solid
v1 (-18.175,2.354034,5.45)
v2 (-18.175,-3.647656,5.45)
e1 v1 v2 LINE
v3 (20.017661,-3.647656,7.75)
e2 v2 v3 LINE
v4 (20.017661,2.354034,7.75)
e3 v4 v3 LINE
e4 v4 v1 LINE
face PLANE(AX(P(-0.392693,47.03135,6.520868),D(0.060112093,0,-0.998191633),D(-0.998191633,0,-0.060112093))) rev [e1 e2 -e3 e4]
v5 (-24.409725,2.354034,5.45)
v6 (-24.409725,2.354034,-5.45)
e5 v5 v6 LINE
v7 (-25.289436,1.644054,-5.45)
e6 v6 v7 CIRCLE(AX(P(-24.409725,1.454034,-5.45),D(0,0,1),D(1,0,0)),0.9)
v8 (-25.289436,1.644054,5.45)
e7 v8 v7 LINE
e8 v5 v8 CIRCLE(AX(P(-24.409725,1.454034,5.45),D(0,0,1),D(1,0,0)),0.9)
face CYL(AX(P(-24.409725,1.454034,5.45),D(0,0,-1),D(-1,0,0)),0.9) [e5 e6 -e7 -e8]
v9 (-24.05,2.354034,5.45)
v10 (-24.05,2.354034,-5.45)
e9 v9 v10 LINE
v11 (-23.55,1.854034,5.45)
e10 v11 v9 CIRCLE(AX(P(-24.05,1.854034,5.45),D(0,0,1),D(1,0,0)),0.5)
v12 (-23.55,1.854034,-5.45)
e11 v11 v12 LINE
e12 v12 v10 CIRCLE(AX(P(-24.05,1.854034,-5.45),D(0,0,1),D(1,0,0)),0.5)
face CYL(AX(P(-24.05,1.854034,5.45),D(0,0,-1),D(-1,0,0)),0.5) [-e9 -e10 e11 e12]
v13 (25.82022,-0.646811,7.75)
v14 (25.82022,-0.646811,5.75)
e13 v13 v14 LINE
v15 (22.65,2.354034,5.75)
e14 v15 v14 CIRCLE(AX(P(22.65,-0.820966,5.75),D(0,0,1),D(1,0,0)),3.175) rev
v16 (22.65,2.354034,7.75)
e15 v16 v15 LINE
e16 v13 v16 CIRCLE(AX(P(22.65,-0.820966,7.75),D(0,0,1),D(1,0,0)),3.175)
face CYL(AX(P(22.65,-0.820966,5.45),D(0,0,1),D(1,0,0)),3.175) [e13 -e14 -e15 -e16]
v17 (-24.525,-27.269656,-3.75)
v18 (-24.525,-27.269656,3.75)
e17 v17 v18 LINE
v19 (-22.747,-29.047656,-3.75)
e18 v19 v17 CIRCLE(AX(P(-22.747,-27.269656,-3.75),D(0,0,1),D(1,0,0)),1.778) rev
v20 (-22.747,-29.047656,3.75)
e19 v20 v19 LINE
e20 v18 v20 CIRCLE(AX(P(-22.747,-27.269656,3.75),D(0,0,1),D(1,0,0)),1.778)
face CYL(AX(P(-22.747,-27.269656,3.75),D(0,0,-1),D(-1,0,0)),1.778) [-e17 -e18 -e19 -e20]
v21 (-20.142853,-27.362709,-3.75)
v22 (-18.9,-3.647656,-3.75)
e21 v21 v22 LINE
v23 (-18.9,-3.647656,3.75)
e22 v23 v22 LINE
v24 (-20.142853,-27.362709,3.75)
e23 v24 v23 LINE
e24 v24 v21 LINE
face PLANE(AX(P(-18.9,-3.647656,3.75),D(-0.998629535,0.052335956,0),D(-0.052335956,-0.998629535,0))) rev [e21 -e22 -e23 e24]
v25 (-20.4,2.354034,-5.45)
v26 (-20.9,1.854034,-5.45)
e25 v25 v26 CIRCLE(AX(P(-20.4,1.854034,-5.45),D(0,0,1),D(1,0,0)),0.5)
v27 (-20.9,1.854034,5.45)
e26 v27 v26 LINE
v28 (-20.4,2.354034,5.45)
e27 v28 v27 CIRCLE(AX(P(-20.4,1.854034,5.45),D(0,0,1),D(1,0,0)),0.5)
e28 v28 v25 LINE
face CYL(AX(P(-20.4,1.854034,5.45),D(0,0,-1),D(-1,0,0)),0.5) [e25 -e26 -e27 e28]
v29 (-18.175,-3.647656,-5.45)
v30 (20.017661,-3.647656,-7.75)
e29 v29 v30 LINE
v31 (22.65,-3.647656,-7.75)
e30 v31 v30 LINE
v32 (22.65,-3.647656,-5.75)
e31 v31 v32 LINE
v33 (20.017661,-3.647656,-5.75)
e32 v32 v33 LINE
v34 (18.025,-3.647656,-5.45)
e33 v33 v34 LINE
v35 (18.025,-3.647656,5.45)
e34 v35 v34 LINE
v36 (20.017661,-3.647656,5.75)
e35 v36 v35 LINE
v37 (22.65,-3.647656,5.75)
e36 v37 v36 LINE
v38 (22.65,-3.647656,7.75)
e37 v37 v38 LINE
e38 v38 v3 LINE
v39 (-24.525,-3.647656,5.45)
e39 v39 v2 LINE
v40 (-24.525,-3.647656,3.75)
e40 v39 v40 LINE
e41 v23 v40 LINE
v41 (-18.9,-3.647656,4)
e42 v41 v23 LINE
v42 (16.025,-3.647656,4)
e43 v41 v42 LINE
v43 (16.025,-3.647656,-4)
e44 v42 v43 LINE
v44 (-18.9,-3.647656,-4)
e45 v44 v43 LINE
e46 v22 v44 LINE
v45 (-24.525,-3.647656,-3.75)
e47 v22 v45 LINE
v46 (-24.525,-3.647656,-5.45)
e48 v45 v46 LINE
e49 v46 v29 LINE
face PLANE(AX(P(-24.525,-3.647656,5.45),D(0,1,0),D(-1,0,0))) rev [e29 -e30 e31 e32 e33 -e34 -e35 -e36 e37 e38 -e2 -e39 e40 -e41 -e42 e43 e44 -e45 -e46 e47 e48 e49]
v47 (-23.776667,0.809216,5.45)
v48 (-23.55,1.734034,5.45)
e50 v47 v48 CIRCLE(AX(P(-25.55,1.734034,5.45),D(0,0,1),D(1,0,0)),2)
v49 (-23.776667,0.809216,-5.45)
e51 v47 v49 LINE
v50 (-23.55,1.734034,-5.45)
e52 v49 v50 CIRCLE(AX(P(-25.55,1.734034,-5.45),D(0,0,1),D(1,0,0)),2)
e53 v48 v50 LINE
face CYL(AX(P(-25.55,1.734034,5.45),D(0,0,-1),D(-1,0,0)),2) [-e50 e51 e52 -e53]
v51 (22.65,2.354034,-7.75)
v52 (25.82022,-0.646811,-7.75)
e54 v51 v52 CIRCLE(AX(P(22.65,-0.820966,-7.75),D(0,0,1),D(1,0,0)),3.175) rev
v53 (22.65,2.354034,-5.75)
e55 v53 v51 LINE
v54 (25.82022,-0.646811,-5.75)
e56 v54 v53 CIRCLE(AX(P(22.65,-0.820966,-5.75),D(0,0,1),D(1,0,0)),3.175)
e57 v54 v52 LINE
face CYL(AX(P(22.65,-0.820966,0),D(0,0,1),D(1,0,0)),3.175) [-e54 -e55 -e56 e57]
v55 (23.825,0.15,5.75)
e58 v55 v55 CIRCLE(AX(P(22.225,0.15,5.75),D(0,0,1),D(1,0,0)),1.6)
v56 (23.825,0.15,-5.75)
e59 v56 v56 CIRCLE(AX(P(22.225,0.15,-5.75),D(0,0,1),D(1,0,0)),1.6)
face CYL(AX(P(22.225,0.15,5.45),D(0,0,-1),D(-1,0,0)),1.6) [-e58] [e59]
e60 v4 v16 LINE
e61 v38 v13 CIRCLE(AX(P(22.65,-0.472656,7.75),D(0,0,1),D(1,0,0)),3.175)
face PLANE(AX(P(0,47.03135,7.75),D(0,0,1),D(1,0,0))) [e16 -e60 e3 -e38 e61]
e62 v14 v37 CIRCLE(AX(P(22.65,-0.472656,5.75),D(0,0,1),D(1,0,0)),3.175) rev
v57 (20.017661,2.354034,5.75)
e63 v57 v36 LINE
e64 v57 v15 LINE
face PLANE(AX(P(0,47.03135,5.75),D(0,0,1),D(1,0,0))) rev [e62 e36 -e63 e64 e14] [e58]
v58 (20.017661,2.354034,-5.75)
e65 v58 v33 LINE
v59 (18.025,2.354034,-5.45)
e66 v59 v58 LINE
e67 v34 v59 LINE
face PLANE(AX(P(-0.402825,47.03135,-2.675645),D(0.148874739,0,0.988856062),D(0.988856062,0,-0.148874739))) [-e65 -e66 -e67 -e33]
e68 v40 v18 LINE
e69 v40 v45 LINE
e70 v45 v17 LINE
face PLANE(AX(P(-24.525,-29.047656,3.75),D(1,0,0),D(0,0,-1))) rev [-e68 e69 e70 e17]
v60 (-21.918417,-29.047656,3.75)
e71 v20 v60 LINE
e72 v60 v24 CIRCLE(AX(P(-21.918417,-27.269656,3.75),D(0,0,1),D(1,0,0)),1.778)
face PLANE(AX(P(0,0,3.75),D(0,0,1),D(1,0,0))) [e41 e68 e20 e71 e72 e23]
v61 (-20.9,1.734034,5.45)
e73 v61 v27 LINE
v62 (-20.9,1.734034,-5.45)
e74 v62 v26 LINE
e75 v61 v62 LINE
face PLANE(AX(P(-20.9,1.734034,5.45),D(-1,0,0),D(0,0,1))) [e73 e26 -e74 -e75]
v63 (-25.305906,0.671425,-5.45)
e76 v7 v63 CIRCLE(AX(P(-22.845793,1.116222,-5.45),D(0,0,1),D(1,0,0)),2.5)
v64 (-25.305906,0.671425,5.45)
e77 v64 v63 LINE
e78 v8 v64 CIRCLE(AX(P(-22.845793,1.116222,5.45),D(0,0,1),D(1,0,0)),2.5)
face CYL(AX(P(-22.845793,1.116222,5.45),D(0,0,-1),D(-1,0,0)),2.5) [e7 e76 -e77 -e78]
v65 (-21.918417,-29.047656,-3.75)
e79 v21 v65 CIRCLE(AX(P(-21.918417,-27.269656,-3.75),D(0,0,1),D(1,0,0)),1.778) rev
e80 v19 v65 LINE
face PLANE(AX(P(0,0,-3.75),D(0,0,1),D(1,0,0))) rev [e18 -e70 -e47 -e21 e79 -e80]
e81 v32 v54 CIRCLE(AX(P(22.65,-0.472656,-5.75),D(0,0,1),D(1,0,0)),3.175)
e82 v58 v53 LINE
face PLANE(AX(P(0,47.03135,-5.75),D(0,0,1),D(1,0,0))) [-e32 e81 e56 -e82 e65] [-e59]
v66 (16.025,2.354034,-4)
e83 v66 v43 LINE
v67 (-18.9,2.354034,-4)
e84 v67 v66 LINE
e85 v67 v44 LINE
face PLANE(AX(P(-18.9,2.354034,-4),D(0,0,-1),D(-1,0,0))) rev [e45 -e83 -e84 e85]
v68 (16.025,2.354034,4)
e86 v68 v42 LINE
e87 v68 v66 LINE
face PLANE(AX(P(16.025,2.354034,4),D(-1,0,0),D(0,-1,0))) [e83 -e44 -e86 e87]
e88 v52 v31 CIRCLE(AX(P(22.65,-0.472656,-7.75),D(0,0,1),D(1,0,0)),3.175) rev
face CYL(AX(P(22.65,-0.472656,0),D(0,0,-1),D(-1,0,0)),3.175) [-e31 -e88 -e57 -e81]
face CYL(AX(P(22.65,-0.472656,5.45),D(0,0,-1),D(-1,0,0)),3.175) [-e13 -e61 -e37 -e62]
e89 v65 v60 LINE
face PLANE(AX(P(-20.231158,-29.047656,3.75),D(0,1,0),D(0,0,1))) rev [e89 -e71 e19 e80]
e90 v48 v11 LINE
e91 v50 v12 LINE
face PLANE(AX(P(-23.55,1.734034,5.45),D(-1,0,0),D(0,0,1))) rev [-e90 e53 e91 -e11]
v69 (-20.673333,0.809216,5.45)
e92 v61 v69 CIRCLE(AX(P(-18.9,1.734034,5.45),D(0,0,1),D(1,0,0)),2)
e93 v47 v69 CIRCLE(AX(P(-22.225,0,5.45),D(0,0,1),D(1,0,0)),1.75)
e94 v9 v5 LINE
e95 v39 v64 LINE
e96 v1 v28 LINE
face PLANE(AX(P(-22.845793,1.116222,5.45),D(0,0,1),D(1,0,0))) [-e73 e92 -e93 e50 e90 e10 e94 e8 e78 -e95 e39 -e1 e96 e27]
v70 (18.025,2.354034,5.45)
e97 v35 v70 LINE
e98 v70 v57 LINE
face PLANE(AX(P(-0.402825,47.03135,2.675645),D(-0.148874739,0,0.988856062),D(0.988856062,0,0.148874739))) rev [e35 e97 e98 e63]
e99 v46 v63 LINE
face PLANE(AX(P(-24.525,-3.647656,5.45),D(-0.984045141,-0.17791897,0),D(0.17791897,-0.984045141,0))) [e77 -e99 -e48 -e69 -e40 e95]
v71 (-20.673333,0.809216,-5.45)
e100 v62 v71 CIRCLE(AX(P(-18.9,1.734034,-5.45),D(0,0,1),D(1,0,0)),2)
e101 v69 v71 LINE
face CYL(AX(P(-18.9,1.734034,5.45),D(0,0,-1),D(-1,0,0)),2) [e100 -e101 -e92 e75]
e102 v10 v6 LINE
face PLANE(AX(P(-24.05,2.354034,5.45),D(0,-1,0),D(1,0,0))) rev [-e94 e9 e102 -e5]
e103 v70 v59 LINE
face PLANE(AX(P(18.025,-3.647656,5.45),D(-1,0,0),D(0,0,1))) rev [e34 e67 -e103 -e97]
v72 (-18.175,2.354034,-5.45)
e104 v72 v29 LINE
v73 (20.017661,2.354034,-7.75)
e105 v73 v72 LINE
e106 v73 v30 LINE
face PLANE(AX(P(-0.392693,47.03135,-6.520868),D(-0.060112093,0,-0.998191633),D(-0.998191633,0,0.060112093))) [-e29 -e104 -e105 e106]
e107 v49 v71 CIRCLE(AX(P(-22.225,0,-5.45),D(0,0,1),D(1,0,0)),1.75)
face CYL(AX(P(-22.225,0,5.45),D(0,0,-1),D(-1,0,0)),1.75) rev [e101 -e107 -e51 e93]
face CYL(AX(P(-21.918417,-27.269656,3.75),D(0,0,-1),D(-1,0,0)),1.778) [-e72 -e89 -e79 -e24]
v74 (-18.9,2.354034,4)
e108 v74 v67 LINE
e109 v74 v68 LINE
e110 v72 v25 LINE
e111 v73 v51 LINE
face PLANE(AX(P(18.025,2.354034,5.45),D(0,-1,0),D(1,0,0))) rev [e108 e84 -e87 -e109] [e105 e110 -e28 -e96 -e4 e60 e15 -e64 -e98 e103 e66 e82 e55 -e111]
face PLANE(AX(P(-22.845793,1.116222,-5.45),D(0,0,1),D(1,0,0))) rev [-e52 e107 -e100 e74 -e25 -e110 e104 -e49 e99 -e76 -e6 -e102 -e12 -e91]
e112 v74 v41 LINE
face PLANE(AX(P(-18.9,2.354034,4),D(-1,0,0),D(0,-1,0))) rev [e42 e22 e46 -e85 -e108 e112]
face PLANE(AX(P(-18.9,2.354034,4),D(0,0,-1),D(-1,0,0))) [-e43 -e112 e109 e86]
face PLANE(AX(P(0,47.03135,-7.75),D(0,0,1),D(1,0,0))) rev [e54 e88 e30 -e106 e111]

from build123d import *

# Parameters (mm, degrees)
BOSS_EXTRUDE1_DEPTH   = 5.45
BOSS_EXTRUDE1_2_DEPTH = 5.45
BOSS_EXTRUDE2_DEPTH   = 5.75
BOSS_EXTRUDE3_DEPTH   = 6.001690088
FILLET1_R             = 3.175
SKETCH3_W             = 34.925
SKETCH3_H             = 8
CUT_EXTRUDE1_DEPTH    = 28.618228517
BOSS_EXTRUDE5_DEPTH   = 3.75
FILLET2_R             = 1.778


with BuildPart() as part:
    # Sketch1 → Boss-Extrude1 (new, symmetric)
    with BuildSketch(Plane.XY):
        with BuildLine():
            ThreePointArc((20.625, 0.15), (20.842969199, -0.656220109), (21.43748858, -1.242776279))
            ThreePointArc((21.43748858, -1.242776279), (23.824989974, 0.155664255), (21.42764708, 1.537165571))
            ThreePointArc((21.42764708, 1.537165571), (20.840123711, 0.951322447), (20.625, 0.15))
        make_face()
    extrude(amount=BOSS_EXTRUDE1_DEPTH, both=True)

    # Sketch1<4> → Boss-Extrude2 (add, symmetric)
    with BuildSketch(Plane.XY):
        with BuildLine():
            ThreePointArc((20.625, 0.15), (20.842969199, -0.656220109), (21.43748858, -1.242776279))
            ThreePointArc((21.43748858, -1.242776279), (23.824989974, 0.155664255), (21.42764708, 1.537165571))
            ThreePointArc((21.42764708, 1.537165571), (20.840123711, 0.951322447), (20.625, 0.15))
        make_face()
    extrude(amount=BOSS_EXTRUDE2_DEPTH, both=True)



with BuildPart() as body_2:
    # Sketch1 → Boss-Extrude1 2 (new, symmetric)
    with BuildSketch(Plane.XY):
        with BuildLine():
            Line((-24.525, -3.647655774), (18.025, -3.647655774))
            Line((18.025, -3.647655774), (18.025, 2.354034313))
            Line((18.025, 2.354034313), (-18.725, 2.354034313))
            Line((-18.725, 2.354034313), (-20.4, 2.354034313))
            ThreePointArc((-20.4, 2.354034313), (-20.753553391, 2.207587704), (-20.9, 1.854034313))
            Line((-20.9, 1.854034313), (-20.9, 1.734034313))
            ThreePointArc((-20.9, 1.734034313), (-20.842506971, 1.257939085), (-20.673333333, 0.809216013))
            ThreePointArc((-20.673333333, 0.809216013), (-22.225, -1.75), (-23.776666667, 0.809216013))
            ThreePointArc((-23.776666667, 0.809216013), (-23.607493029, 1.257939085), (-23.55, 1.734034313))
            Line((-23.55, 1.734034313), (-23.55, 1.854034313))
            ThreePointArc((-23.55, 1.854034313), (-23.696446609, 2.207587704), (-24.05, 2.354034313))
            Line((-24.05, 2.354034313), (-24.409724637, 2.354034313))
            ThreePointArc((-24.409724637, 2.354034313), (-24.974960254, 2.154397574), (-25.289436326, 1.644053639))
            ThreePointArc((-25.289436326, 1.644053639), (-25.345434425, 1.158547963), (-25.305905598, 0.671424755))
            Line((-25.305905598, 0.671424755), (-24.525, -3.647655774))
        make_face()
    extrude(amount=BOSS_EXTRUDE1_2_DEPTH, both=True)


with BuildPart() as part_1:
    add(part.part)

    add(body_2.part)  # Boss-Extrude3 merges body 2
    # Sketch2 → Boss-Extrude3 (add)
    with BuildSketch(Plane(origin=(0, -3.647655774, 0), x_dir=(-1, 0, 0), z_dir=(0, -1, 0))):
        Polygon((18.175, 5.45), (-18.025, 5.45), (18.175, 0), align=None)
        Polygon((-25.825, 7.75), (-25.825, 5.75), (-20.01766055, 5.75), (-18.025, 5.45), (18.175, 5.45), (-20.01766055, 7.75), align=None)
        Polygon((18.175, -5.45), (18.175, 0), (-18.025, -5.45), align=None)
        Polygon((-20.01766055, -7.75), (18.175, -5.45), (-18.025, -5.45), (-20.01766055, -5.75), (-25.825, -5.75), (-25.825, -7.75), align=None)
    extrude(amount=-BOSS_EXTRUDE3_DEPTH)

    # Fillet1
    # the kernel refuses this fillet: 3.175 mm, written as the material it takes off along each edge
    with BuildSketch(Plane(origin=(25.825, 2.354034313, -15.687500001), x_dir=(-1, 0, 0), z_dir=(0, 0, 1)), Plane(origin=(25.825, 2.354034313, -2.187500001), x_dir=(-1, 0, 0), z_dir=(0, 0, 1))) as fillet1_piece_1:
        with BuildLine():
            CenterArc((FILLET1_R, FILLET1_R), FILLET1_R, 180, 90)
            Line((0, FILLET1_R), (0, 0))
            Line((0, 0), (FILLET1_R, 0))
        make_face()
    extrude(amount=17.875000002, mode=Mode.SUBTRACT)
    with BuildSketch(Plane(origin=(25.825, -3.647655774, -15.6875), x_dir=(-1, 0, 0), z_dir=(0, 0, 1))) as fillet1_piece_2:
        with BuildLine():
            CenterArc((FILLET1_R, -FILLET1_R), FILLET1_R, 90, 90)
            Line((0, -FILLET1_R), (0, 0))
            Line((0, 0), (FILLET1_R, 0))
        make_face()
    extrude(amount=17.875, mode=Mode.SUBTRACT)
    with BuildSketch(Plane(origin=(25.825, -3.647655774, -2.1875), x_dir=(0, 1, 0), z_dir=(0, 0, 1))) as fillet1_piece_3:
        with BuildLine():
            CenterArc((FILLET1_R, FILLET1_R), FILLET1_R, 180, 90)
            Line((0, FILLET1_R), (0, 0))
            Line((0, 0), (FILLET1_R, 0))
        make_face()
    extrude(amount=17.875, mode=Mode.SUBTRACT)

    # Sketch3 → Cut-Extrude1 (cut, through all)
    with BuildSketch(Plane(origin=(0, -3.647655774, 0), x_dir=(-1, 0, 0), z_dir=(0, -1, 0))):
        with Locations((1.4375, 0)):
            Rectangle(SKETCH3_W, SKETCH3_H)
    extrude(amount=-CUT_EXTRUDE1_DEPTH, mode=Mode.SUBTRACT)

    # Sketch4 → Boss-Extrude5 (add, symmetric)
    with BuildSketch(Plane.XY):
        Polygon((-18.9, -3.647655774), (-20.231157594, -29.047655774), (-24.525, -29.047655774), (-24.525, -3.647655774), align=None)
    extrude(amount=BOSS_EXTRUDE5_DEPTH, both=True)

    # Fillet2
    fillet2_edges = [part_1.edges().sort_by_distance(p)[0] for p in [
        (-24.525, -29.047655774, 0),
        (-20.231157594, -29.047655774, 0),
    ]]
    fillet(fillet2_edges, radius=FILLET2_R)


solid = part_1.part
